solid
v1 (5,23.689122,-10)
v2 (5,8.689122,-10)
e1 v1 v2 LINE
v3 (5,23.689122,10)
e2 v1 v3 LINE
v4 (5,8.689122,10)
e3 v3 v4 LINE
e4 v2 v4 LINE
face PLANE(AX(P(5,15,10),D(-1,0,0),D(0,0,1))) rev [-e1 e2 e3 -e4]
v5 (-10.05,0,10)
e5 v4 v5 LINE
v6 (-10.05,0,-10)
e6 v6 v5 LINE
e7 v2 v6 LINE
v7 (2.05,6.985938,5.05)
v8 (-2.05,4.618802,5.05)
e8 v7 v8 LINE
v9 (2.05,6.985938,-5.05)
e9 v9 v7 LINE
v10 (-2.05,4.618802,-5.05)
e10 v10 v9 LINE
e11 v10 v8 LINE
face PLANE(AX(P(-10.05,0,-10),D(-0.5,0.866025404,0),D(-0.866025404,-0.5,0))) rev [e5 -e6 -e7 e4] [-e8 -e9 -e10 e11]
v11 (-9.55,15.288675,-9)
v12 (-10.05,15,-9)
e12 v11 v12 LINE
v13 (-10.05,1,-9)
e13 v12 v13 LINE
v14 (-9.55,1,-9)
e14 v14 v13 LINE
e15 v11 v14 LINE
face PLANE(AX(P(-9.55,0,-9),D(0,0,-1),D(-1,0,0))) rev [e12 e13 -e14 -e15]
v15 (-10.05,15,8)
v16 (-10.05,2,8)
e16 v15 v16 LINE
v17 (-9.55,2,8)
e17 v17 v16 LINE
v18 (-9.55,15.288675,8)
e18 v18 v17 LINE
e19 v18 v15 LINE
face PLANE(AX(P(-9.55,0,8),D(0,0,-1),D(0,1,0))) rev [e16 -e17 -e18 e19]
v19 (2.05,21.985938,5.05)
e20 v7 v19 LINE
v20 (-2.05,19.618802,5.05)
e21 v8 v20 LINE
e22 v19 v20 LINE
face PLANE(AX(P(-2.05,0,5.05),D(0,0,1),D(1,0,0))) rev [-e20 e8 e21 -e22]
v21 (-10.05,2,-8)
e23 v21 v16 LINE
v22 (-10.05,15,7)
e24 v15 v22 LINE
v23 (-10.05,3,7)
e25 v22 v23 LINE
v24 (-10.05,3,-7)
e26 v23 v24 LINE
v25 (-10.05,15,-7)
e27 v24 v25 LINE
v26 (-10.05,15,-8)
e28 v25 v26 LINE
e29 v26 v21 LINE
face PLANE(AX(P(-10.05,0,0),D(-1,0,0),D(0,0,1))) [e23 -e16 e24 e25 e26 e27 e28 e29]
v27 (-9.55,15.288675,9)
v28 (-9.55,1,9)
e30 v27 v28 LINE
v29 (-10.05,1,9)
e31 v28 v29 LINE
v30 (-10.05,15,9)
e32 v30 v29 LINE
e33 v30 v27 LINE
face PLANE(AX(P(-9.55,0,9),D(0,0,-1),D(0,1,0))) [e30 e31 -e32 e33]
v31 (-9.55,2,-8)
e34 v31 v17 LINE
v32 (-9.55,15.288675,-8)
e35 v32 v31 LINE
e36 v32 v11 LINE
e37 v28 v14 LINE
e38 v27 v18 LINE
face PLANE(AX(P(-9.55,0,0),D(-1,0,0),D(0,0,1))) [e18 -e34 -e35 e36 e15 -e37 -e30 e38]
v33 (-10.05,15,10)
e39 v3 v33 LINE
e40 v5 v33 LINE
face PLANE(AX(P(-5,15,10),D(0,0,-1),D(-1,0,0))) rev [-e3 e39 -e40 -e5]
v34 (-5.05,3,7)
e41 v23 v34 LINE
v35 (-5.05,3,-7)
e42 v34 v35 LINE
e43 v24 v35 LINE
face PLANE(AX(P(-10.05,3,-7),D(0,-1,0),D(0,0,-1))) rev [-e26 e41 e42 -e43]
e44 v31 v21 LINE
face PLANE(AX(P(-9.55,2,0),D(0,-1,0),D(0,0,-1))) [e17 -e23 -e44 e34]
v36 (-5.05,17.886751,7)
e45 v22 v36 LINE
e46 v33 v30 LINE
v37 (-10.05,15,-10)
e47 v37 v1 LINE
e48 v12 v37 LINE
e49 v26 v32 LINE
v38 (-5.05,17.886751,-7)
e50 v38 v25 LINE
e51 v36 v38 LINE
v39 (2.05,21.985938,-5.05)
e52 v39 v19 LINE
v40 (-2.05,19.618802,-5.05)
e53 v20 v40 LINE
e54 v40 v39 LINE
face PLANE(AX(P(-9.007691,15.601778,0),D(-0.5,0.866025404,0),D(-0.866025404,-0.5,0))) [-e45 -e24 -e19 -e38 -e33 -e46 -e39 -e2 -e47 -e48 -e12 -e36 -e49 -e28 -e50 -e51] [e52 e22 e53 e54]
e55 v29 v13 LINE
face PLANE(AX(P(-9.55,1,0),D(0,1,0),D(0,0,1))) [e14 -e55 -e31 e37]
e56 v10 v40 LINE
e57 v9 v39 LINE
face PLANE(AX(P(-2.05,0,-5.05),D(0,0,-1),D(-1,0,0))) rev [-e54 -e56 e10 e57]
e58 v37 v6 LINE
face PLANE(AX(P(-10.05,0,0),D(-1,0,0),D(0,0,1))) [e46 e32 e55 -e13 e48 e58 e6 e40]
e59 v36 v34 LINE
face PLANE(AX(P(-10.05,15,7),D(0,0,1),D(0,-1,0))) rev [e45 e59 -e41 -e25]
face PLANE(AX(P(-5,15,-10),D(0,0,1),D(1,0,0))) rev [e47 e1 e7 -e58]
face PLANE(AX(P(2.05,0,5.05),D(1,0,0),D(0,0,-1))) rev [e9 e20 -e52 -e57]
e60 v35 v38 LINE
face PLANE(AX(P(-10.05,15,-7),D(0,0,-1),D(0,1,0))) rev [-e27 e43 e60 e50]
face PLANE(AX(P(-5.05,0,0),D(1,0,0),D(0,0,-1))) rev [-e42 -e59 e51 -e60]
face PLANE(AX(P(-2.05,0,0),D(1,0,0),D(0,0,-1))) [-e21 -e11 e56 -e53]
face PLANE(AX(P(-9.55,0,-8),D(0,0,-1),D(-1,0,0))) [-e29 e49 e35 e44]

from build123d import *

# Parameters (mm, degrees)
SKETCH2_W             = 10
SKETCH2_H             = 20
BOSS_EXTRUDE1_DEPTH   = 15
SKETCH3_W             = 4.1
SKETCH3_H             = 10.1
CUT_EXTRUDE1_DEPTH    = 19.708286934
SKETCH4_W             = 2.95
SKETCH4_H             = 4.95
CUT_EXTRUDE2_DEPTH    = 15
SKETCH6_W             = 20
SKETCH6_H             = 15
BOSS_EXTRUDE2_DEPTH   = 3
BOSS_EXTRUDE3_DEPTH   = 5
CUT_EXTRUDE3_DEPTH    = 27.944433562
CUT_EXTRUDE4_DEPTH    = 0.5
BOSS_EXTRUDE6_START   = -10
BOSS_EXTRUDE6_DEPTH   = 20
BOSS_EXTRUDE6_2_DEPTH = 4.95
BOSS_EXTRUDE6_START_2 = 5.05
BOSS_EXTRUDE6_3_DEPTH = 4.95
BOSS_EXTRUDE6_4_DEPTH = 3
BOSS_EXTRUDE6_START_3 = 7
BOSS_EXTRUDE6_5_DEPTH = 3
BOSS_EXTRUDE6_6_DEPTH = 1
BOSS_EXTRUDE6_START_4 = -8
BOSS_EXTRUDE6_7_DEPTH = 1
BOSS_EXTRUDE6_8_DEPTH = 1
BOSS_EXTRUDE6_START_5 = 9
BOSS_EXTRUDE6_9_DEPTH = 1


# Read off the part's stored shape, not the designer's step: Boss-Extrude6
with BuildPart() as part:
    # Sketch2 → Boss-Extrude1 (new body)
    with BuildSketch(Plane(origin=(0, 0, 0), x_dir=(1, 0, 0), z_dir=(0, 1, 0))):
        Rectangle(SKETCH2_W, SKETCH2_H)
    extrude(amount=BOSS_EXTRUDE1_DEPTH)

    # Sketch3 → Cut-Extrude1 (cut, through all)
    with BuildSketch(Plane(origin=(0, 15, 0), x_dir=(1, 0, 0), z_dir=(0, 1, 0))):
        Rectangle(SKETCH3_W, SKETCH3_H)
    extrude(amount=-CUT_EXTRUDE1_DEPTH, mode=Mode.SUBTRACT)

    # Sketch4 → Cut-Extrude2 (cut)
    with BuildSketch(Plane(origin=(0, 15, 0), x_dir=(1, 0, 0), z_dir=(0, 1, 0))):
        Polygon((-2.05, 10), (-5, 10), (-5, -5.05), (-2.05, -5.05), (-2.05, 5.05), align=None)
        with Locations((-3.525, -7.525)):
            Rectangle(SKETCH4_W, SKETCH4_H)
    extrude(amount=-CUT_EXTRUDE2_DEPTH, mode=Mode.SUBTRACT)

    # Sketch6 → Boss-Extrude2 (add)
    with BuildSketch(Plane.ZY.offset(2.05)):
        with Locations((0, 7.5)):
            Rectangle(SKETCH6_W, SKETCH6_H)
    extrude(amount=BOSS_EXTRUDE2_DEPTH)

    # Sketch8 → Boss-Extrude3 (add)
    with BuildSketch(Plane.ZY.offset(5.05)):
        Polygon((-7, 15), (-10, 15), (-10, 0), (10, 0), (10, 15), (7, 15), (7, 3), (-7, 3), align=None)
    extrude(amount=BOSS_EXTRUDE3_DEPTH)

    # Sketch10 → Cut-Extrude3 (cut, through all)
    with BuildSketch(Plane.XY.offset(10)):
        Polygon((-10.05, 0), (5, 8.689121551), (5, 0), align=None)
    extrude(amount=-CUT_EXTRUDE3_DEPTH, mode=Mode.SUBTRACT)

    # Sketch11 → Cut-Extrude4 (cut)
    with BuildSketch(Plane.ZY.offset(10.05)):
        Polygon((-8, 2), (-8, 15), (-9, 15), (-9, 1), (0, 1), (9, 1), (9, 15), (8, 15), (8, 2), (0, 2), align=None)
    extrude(amount=-CUT_EXTRUDE4_DEPTH, mode=Mode.SUBTRACT)

    # Boss-Extrude6 outline → Boss-Extrude6 (add)
    with BuildSketch(Plane.XY.offset(BOSS_EXTRUDE6_START)):
        Polygon((-5.05, 17.886751346), (-5.05, 15), (-2.05, 15), (-2.05, 19.618802154), align=None)
        Polygon((2.05, 21.985938257), (2.05, 15), (5, 15), (5, 23.689121551), align=None)
    extrude(amount=BOSS_EXTRUDE6_DEPTH)

    # Boss-Extrude6 2 outline → Boss-Extrude6 2 (add)
    with BuildSketch(Plane.XY.offset(BOSS_EXTRUDE6_START)):
        Polygon((-2.05, 19.618802154), (-2.05, 15), (2.05, 15), (2.05, 21.985938257), align=None)
    extrude(amount=BOSS_EXTRUDE6_2_DEPTH)

    # Boss-Extrude6 3 outline → Boss-Extrude6 3 (add)
    with BuildSketch(Plane.XY.offset(BOSS_EXTRUDE6_START_2)):
        Polygon((-2.05, 19.618802154), (-2.05, 15), (2.05, 15), (2.05, 21.985938257), align=None)
    extrude(amount=BOSS_EXTRUDE6_3_DEPTH)

    # Boss-Extrude6 4 outline → Boss-Extrude6 4 (add)
    with BuildSketch(Plane.XY.offset(BOSS_EXTRUDE6_START)):
        Polygon((-9.55, 15), (-5.05, 15), (-5.05, 17.886751346), (-9.55, 15.288675135), align=None)
    extrude(amount=BOSS_EXTRUDE6_4_DEPTH)

    # Boss-Extrude6 5 outline → Boss-Extrude6 5 (add)
    with BuildSketch(Plane.XY.offset(BOSS_EXTRUDE6_START_3)):
        Polygon((-9.55, 15), (-5.05, 15), (-5.05, 17.886751346), (-9.55, 15.288675135), align=None)
    extrude(amount=BOSS_EXTRUDE6_5_DEPTH)

    # Boss-Extrude6 6 outline → Boss-Extrude6 6 (add)
    with BuildSketch(Plane.XY.offset(BOSS_EXTRUDE6_START)):
        Polygon((-10.05, 15), (-9.55, 15), (-9.55, 15.288675135), align=None)
    extrude(amount=BOSS_EXTRUDE6_6_DEPTH)

    # Boss-Extrude6 7 outline → Boss-Extrude6 7 (add)
    with BuildSketch(Plane.XY.offset(BOSS_EXTRUDE6_START_4)):
        Polygon((-10.05, 15), (-9.55, 15), (-9.55, 15.288675135), align=None)
    extrude(amount=BOSS_EXTRUDE6_7_DEPTH)

    # Boss-Extrude6 8 outline → Boss-Extrude6 8 (add)
    with BuildSketch(Plane.XY.offset(BOSS_EXTRUDE6_START_3)):
        Polygon((-10.05, 15), (-9.55, 15), (-9.55, 15.288675135), align=None)
    extrude(amount=BOSS_EXTRUDE6_8_DEPTH)

    # Boss-Extrude6 9 outline → Boss-Extrude6 9 (add)
    with BuildSketch(Plane.XY.offset(BOSS_EXTRUDE6_START_5)):
        Polygon((-10.05, 15), (-9.55, 15), (-9.55, 15.288675135), align=None)
    extrude(amount=BOSS_EXTRUDE6_9_DEPTH)


solid = part.part
